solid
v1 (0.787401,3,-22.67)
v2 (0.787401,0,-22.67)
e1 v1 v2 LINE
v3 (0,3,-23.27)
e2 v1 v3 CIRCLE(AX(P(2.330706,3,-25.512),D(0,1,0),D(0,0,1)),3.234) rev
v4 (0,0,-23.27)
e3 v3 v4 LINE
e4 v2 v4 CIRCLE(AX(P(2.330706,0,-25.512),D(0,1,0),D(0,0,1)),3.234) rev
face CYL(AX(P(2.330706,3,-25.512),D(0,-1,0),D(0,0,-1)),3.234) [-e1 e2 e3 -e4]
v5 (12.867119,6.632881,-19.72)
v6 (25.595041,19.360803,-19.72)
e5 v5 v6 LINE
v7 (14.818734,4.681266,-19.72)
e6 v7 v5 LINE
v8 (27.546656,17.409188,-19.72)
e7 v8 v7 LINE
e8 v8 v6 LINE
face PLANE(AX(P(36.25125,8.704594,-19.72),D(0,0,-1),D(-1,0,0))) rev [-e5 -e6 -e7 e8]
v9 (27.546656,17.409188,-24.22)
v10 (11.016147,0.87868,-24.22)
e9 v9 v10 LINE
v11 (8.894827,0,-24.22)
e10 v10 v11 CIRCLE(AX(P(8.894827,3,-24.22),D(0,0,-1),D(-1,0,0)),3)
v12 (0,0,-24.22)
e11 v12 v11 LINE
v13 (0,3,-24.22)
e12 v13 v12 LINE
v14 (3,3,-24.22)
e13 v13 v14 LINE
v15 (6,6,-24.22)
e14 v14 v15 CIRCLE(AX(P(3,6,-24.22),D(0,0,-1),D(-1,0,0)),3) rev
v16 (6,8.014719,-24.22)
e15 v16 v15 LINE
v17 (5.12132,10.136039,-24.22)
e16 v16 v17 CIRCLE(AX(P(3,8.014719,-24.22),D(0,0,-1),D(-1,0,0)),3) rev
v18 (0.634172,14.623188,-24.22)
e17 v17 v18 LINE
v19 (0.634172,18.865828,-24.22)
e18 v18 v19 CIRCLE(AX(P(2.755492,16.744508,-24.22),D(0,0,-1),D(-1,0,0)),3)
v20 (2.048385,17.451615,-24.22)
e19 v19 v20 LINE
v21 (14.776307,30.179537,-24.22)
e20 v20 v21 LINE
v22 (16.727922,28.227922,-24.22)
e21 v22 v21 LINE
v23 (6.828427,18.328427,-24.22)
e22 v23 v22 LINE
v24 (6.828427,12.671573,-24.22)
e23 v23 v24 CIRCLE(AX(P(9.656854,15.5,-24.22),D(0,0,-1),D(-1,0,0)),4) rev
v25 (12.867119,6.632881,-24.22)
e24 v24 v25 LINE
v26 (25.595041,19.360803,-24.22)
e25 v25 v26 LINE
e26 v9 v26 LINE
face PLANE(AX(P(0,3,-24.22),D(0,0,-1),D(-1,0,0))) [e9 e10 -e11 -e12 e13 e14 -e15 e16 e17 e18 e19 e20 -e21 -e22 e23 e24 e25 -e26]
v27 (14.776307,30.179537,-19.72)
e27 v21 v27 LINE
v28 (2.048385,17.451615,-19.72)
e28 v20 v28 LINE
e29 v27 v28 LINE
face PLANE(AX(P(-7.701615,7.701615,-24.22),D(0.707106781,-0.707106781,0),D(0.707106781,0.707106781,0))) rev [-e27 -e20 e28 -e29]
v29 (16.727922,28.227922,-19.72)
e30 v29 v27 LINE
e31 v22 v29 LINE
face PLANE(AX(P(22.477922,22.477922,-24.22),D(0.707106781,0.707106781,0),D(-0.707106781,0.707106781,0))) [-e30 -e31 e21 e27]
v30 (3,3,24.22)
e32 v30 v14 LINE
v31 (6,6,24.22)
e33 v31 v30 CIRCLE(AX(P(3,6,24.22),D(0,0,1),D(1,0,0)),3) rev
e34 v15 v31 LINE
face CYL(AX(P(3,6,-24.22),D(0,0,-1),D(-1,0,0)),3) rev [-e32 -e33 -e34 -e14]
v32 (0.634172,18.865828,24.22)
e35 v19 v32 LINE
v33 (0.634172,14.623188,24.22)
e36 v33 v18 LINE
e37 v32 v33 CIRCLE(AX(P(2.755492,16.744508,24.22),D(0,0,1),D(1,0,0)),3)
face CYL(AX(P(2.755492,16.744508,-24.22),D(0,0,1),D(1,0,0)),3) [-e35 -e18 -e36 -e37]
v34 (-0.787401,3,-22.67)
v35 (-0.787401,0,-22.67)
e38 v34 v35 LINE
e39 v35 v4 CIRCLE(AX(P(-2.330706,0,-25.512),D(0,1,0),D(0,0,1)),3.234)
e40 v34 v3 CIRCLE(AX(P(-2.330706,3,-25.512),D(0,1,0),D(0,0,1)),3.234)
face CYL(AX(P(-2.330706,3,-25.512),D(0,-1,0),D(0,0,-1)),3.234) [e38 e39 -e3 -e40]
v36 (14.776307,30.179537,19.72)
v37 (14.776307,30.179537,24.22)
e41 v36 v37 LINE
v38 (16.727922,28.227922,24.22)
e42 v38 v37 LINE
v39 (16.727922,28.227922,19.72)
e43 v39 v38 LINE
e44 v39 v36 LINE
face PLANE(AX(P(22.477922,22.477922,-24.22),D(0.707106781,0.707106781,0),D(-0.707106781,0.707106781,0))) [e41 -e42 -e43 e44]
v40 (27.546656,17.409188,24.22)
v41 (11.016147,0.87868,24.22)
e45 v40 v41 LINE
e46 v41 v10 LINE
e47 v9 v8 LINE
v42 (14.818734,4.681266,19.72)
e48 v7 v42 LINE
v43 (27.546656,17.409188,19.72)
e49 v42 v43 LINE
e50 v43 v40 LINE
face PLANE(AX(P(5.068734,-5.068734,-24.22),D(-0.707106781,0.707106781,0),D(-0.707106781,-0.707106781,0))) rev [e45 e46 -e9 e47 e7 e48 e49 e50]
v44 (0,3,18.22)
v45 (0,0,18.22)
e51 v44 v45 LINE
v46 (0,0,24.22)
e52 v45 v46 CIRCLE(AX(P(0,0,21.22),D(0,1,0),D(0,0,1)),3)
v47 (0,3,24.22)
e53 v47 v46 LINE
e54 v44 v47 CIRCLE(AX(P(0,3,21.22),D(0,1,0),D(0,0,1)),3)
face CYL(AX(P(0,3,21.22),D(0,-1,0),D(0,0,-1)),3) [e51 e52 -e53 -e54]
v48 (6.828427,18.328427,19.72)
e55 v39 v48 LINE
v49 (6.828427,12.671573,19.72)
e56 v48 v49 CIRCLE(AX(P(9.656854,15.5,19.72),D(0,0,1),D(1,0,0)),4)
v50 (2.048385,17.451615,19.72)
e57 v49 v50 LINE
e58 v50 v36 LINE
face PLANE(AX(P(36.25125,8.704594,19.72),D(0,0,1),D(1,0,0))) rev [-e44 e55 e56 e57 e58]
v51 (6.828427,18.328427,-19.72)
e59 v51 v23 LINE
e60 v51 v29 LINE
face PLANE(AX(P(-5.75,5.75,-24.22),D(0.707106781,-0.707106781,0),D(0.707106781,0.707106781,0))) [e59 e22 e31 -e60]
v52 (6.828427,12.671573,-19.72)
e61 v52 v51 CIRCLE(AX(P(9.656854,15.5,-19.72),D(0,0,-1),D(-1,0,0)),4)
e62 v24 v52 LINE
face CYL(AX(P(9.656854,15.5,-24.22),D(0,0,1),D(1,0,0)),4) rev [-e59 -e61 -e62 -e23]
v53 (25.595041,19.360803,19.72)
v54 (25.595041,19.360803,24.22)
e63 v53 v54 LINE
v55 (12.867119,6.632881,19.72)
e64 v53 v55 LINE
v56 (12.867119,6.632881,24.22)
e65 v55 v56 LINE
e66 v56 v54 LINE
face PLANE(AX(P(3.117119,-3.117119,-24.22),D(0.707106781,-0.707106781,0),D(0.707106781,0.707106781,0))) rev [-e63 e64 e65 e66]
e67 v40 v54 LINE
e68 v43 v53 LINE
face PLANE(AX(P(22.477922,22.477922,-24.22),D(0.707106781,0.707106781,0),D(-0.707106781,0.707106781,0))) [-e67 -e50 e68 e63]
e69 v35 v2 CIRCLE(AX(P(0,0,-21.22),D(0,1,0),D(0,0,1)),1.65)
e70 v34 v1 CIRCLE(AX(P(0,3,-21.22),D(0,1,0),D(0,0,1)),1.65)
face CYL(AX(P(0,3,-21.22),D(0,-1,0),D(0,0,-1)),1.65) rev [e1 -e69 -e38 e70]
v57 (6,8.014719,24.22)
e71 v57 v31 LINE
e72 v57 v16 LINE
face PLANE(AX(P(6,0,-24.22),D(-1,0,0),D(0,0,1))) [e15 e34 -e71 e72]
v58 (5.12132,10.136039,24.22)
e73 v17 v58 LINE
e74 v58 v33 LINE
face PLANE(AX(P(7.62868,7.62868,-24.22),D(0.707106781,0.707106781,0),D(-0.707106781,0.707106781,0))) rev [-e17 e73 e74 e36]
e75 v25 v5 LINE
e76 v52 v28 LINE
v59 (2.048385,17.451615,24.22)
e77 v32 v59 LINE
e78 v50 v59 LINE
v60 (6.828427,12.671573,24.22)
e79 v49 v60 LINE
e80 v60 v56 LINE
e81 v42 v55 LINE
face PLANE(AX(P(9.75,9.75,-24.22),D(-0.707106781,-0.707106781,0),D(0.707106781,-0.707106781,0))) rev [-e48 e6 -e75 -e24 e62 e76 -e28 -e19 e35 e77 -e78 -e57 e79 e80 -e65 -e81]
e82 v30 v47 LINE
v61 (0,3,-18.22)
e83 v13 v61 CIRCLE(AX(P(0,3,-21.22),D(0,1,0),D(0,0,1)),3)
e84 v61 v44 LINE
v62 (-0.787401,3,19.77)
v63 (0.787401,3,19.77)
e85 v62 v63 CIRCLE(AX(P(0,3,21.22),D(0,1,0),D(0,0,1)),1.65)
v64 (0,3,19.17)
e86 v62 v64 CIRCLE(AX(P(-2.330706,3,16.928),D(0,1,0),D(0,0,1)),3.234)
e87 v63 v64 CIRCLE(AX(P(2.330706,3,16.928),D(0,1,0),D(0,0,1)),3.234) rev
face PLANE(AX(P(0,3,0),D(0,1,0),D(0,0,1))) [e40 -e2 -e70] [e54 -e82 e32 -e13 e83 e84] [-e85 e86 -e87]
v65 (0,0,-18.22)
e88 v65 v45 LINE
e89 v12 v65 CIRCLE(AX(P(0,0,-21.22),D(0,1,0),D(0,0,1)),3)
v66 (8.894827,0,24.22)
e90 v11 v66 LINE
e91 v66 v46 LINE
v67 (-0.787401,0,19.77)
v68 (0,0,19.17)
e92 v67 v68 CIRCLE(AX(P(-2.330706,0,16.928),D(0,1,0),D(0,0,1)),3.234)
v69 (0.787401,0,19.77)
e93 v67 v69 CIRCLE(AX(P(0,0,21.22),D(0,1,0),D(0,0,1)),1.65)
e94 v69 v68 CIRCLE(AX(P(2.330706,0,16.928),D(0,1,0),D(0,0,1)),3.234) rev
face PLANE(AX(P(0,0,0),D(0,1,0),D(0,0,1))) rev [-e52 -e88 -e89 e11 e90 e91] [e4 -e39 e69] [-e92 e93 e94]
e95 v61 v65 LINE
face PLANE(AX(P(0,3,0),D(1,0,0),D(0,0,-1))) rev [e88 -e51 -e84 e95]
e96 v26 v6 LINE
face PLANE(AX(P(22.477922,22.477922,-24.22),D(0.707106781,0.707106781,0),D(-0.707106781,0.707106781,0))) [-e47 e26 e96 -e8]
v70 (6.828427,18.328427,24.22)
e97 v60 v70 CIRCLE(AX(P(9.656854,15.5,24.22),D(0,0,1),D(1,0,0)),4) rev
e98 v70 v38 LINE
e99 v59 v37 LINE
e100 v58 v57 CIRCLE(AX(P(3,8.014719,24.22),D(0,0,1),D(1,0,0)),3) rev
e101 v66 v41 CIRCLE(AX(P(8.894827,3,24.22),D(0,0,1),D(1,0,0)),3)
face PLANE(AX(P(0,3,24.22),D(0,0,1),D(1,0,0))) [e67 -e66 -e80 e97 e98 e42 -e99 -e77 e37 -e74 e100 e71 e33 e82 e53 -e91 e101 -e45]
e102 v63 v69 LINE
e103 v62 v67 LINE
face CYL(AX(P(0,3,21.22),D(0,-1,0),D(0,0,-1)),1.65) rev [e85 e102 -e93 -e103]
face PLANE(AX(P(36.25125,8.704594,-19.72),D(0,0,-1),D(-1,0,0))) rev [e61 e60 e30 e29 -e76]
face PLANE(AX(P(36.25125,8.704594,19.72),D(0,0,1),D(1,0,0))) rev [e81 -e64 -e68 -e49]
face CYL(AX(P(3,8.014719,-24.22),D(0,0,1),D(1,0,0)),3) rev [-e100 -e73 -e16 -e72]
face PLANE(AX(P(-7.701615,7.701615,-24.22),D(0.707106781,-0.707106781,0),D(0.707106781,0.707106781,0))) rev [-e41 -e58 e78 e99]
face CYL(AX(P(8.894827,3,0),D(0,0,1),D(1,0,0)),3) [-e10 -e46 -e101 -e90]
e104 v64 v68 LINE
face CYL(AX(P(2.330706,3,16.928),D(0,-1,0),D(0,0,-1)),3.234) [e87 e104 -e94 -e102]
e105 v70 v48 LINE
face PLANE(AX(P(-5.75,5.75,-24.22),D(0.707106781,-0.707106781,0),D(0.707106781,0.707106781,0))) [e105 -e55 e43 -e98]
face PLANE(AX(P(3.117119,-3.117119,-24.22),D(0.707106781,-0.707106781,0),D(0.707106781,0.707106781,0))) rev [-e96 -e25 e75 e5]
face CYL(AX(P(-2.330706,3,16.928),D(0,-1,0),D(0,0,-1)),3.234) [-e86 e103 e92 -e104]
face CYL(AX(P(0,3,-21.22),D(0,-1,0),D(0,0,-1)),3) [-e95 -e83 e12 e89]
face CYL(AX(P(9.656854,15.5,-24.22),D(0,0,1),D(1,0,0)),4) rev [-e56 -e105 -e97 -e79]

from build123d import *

# Parameters (mm, degrees)
BOSS_EXTRUDE1_DEPTH      = 3
BOSS_EXTRUDE2_DEPTH      = 24.22
BOSS_EXTRUDE2_DEPTH_BACK = 24.22
SKETCH4_W                = 39.44
SKETCH4_H                = 18
CUT_EXTRUDE2_DEPTH       = 49.314655701
FILLET1_R                = 3
FILLET2_R                = 3
FILLET3_R                = 4


with BuildPart() as part:
    # Sketch1 → Boss-Extrude1 (new body)
    with BuildSketch(Plane(origin=(0, 0, 0), x_dir=(1, 0, 0), z_dir=(0, 1, 0))):
        with BuildLine():
            ThreePointArc((-2, 18.983932023), (-1.070466269, 18.417482923), (0, 18.22))
            Line((0, 18.22), (0, -18.22))
            ThreePointArc((0, -18.22), (-1.070466269, -18.417482923), (-2, -18.983932023))
            ThreePointArc((-2, -18.983932023), (-2.802517077, -22.290466269), (0, -24.22))
            Line((0, -24.22), (3, -24.22))
            Line((3, -24.22), (3, 24.22))
            Line((3, 24.22), (0, 24.22))
            ThreePointArc((0, 24.22), (-2.802517077, 22.290466269), (-2, 18.983932023))
        make_face()
        with BuildLine():
            ThreePointArc((0.787400787, -19.77), (1.41804642, -20.376409845), (1.65, -21.22))
            ThreePointArc((1.65, -21.22), (-0.843590155, -22.63804642), (-0.787400787, -19.77))
            ThreePointArc((-0.787400787, -19.77), (-0.370606333, -19.500307136), (0, -19.17))
            ThreePointArc((0, -19.17), (0.370606333, -19.500307136), (0.787400787, -19.77))
        make_face(mode=Mode.SUBTRACT)
        with BuildLine():
            ThreePointArc((0.787400787, 22.67), (1.41804642, 22.063590155), (1.65, 21.22))
            ThreePointArc((1.65, 21.22), (-0.843590155, 19.80195358), (-0.787400787, 22.67))
            ThreePointArc((-0.787400787, 22.67), (-0.370606333, 22.939692864), (0, 23.27))
            ThreePointArc((0, 23.27), (0.370606333, 22.939692864), (0.787400787, 22.67))
        make_face(mode=Mode.SUBTRACT)
    extrude(amount=BOSS_EXTRUDE1_DEPTH)

    # Sketch2 → Boss-Extrude2 (add, two sides: drawn at the far end of the back side and taken through both)
    with BuildSketch(Plane.XY.offset(-BOSS_EXTRUDE2_DEPTH_BACK)):
        Polygon((3, 3), (3, 0), (10.137467504, 0), (27.546655814, 17.409188309), (25.595041097, 19.360803025), (12.867119036, 6.632880964), (4, 15.5), (16.727922061, 28.227922061), (14.776307345, 30.179536777), (2.048385284, 17.451614716), (0.634171722, 18.865828278), (-1.487148622, 16.744507935), (6, 9.257359313), (6, 3), align=None)
    extrude(amount=BOSS_EXTRUDE2_DEPTH + BOSS_EXTRUDE2_DEPTH_BACK)

    # Sketch4 → Cut-Extrude2 (cut, through all)
    with BuildSketch(Plane(origin=(-7.701614716, 7.701614716, 0), x_dir=(0, 0, 1), z_dir=(-0.7071067811865439, 0.7071067811865511, 0))):
        with Locations((0, 22.788582233)):
            Rectangle(SKETCH4_W, SKETCH4_H)
    extrude(amount=-CUT_EXTRUDE2_DEPTH, mode=Mode.SUBTRACT)

    # Fillet1
    fillet1_edges = [part.edges().sort_by_distance(p)[0] for p in [
        (6, 3, 0),
        (6, 9.257359313, 0),
    ]]
    fillet(fillet1_edges, radius=FILLET1_R)

    # Fillet2
    fillet2_edges = [part.edges().sort_by_distance(p)[0] for p in [
        (-1.487148622, 16.744507935, 0),
        (10.137467504, 0, 0),
    ]]
    fillet(fillet2_edges, radius=FILLET2_R - 0.0001)  # a hair under: the kernel refuses the full size

    # Fillet3
    fillet3_edges = [part.edges().sort_by_distance(p)[0] for p in [
        (4, 15.5, -21.97),
        (4, 15.5, 21.97),
    ]]
    fillet(fillet3_edges, radius=FILLET3_R)


solid = part.part
